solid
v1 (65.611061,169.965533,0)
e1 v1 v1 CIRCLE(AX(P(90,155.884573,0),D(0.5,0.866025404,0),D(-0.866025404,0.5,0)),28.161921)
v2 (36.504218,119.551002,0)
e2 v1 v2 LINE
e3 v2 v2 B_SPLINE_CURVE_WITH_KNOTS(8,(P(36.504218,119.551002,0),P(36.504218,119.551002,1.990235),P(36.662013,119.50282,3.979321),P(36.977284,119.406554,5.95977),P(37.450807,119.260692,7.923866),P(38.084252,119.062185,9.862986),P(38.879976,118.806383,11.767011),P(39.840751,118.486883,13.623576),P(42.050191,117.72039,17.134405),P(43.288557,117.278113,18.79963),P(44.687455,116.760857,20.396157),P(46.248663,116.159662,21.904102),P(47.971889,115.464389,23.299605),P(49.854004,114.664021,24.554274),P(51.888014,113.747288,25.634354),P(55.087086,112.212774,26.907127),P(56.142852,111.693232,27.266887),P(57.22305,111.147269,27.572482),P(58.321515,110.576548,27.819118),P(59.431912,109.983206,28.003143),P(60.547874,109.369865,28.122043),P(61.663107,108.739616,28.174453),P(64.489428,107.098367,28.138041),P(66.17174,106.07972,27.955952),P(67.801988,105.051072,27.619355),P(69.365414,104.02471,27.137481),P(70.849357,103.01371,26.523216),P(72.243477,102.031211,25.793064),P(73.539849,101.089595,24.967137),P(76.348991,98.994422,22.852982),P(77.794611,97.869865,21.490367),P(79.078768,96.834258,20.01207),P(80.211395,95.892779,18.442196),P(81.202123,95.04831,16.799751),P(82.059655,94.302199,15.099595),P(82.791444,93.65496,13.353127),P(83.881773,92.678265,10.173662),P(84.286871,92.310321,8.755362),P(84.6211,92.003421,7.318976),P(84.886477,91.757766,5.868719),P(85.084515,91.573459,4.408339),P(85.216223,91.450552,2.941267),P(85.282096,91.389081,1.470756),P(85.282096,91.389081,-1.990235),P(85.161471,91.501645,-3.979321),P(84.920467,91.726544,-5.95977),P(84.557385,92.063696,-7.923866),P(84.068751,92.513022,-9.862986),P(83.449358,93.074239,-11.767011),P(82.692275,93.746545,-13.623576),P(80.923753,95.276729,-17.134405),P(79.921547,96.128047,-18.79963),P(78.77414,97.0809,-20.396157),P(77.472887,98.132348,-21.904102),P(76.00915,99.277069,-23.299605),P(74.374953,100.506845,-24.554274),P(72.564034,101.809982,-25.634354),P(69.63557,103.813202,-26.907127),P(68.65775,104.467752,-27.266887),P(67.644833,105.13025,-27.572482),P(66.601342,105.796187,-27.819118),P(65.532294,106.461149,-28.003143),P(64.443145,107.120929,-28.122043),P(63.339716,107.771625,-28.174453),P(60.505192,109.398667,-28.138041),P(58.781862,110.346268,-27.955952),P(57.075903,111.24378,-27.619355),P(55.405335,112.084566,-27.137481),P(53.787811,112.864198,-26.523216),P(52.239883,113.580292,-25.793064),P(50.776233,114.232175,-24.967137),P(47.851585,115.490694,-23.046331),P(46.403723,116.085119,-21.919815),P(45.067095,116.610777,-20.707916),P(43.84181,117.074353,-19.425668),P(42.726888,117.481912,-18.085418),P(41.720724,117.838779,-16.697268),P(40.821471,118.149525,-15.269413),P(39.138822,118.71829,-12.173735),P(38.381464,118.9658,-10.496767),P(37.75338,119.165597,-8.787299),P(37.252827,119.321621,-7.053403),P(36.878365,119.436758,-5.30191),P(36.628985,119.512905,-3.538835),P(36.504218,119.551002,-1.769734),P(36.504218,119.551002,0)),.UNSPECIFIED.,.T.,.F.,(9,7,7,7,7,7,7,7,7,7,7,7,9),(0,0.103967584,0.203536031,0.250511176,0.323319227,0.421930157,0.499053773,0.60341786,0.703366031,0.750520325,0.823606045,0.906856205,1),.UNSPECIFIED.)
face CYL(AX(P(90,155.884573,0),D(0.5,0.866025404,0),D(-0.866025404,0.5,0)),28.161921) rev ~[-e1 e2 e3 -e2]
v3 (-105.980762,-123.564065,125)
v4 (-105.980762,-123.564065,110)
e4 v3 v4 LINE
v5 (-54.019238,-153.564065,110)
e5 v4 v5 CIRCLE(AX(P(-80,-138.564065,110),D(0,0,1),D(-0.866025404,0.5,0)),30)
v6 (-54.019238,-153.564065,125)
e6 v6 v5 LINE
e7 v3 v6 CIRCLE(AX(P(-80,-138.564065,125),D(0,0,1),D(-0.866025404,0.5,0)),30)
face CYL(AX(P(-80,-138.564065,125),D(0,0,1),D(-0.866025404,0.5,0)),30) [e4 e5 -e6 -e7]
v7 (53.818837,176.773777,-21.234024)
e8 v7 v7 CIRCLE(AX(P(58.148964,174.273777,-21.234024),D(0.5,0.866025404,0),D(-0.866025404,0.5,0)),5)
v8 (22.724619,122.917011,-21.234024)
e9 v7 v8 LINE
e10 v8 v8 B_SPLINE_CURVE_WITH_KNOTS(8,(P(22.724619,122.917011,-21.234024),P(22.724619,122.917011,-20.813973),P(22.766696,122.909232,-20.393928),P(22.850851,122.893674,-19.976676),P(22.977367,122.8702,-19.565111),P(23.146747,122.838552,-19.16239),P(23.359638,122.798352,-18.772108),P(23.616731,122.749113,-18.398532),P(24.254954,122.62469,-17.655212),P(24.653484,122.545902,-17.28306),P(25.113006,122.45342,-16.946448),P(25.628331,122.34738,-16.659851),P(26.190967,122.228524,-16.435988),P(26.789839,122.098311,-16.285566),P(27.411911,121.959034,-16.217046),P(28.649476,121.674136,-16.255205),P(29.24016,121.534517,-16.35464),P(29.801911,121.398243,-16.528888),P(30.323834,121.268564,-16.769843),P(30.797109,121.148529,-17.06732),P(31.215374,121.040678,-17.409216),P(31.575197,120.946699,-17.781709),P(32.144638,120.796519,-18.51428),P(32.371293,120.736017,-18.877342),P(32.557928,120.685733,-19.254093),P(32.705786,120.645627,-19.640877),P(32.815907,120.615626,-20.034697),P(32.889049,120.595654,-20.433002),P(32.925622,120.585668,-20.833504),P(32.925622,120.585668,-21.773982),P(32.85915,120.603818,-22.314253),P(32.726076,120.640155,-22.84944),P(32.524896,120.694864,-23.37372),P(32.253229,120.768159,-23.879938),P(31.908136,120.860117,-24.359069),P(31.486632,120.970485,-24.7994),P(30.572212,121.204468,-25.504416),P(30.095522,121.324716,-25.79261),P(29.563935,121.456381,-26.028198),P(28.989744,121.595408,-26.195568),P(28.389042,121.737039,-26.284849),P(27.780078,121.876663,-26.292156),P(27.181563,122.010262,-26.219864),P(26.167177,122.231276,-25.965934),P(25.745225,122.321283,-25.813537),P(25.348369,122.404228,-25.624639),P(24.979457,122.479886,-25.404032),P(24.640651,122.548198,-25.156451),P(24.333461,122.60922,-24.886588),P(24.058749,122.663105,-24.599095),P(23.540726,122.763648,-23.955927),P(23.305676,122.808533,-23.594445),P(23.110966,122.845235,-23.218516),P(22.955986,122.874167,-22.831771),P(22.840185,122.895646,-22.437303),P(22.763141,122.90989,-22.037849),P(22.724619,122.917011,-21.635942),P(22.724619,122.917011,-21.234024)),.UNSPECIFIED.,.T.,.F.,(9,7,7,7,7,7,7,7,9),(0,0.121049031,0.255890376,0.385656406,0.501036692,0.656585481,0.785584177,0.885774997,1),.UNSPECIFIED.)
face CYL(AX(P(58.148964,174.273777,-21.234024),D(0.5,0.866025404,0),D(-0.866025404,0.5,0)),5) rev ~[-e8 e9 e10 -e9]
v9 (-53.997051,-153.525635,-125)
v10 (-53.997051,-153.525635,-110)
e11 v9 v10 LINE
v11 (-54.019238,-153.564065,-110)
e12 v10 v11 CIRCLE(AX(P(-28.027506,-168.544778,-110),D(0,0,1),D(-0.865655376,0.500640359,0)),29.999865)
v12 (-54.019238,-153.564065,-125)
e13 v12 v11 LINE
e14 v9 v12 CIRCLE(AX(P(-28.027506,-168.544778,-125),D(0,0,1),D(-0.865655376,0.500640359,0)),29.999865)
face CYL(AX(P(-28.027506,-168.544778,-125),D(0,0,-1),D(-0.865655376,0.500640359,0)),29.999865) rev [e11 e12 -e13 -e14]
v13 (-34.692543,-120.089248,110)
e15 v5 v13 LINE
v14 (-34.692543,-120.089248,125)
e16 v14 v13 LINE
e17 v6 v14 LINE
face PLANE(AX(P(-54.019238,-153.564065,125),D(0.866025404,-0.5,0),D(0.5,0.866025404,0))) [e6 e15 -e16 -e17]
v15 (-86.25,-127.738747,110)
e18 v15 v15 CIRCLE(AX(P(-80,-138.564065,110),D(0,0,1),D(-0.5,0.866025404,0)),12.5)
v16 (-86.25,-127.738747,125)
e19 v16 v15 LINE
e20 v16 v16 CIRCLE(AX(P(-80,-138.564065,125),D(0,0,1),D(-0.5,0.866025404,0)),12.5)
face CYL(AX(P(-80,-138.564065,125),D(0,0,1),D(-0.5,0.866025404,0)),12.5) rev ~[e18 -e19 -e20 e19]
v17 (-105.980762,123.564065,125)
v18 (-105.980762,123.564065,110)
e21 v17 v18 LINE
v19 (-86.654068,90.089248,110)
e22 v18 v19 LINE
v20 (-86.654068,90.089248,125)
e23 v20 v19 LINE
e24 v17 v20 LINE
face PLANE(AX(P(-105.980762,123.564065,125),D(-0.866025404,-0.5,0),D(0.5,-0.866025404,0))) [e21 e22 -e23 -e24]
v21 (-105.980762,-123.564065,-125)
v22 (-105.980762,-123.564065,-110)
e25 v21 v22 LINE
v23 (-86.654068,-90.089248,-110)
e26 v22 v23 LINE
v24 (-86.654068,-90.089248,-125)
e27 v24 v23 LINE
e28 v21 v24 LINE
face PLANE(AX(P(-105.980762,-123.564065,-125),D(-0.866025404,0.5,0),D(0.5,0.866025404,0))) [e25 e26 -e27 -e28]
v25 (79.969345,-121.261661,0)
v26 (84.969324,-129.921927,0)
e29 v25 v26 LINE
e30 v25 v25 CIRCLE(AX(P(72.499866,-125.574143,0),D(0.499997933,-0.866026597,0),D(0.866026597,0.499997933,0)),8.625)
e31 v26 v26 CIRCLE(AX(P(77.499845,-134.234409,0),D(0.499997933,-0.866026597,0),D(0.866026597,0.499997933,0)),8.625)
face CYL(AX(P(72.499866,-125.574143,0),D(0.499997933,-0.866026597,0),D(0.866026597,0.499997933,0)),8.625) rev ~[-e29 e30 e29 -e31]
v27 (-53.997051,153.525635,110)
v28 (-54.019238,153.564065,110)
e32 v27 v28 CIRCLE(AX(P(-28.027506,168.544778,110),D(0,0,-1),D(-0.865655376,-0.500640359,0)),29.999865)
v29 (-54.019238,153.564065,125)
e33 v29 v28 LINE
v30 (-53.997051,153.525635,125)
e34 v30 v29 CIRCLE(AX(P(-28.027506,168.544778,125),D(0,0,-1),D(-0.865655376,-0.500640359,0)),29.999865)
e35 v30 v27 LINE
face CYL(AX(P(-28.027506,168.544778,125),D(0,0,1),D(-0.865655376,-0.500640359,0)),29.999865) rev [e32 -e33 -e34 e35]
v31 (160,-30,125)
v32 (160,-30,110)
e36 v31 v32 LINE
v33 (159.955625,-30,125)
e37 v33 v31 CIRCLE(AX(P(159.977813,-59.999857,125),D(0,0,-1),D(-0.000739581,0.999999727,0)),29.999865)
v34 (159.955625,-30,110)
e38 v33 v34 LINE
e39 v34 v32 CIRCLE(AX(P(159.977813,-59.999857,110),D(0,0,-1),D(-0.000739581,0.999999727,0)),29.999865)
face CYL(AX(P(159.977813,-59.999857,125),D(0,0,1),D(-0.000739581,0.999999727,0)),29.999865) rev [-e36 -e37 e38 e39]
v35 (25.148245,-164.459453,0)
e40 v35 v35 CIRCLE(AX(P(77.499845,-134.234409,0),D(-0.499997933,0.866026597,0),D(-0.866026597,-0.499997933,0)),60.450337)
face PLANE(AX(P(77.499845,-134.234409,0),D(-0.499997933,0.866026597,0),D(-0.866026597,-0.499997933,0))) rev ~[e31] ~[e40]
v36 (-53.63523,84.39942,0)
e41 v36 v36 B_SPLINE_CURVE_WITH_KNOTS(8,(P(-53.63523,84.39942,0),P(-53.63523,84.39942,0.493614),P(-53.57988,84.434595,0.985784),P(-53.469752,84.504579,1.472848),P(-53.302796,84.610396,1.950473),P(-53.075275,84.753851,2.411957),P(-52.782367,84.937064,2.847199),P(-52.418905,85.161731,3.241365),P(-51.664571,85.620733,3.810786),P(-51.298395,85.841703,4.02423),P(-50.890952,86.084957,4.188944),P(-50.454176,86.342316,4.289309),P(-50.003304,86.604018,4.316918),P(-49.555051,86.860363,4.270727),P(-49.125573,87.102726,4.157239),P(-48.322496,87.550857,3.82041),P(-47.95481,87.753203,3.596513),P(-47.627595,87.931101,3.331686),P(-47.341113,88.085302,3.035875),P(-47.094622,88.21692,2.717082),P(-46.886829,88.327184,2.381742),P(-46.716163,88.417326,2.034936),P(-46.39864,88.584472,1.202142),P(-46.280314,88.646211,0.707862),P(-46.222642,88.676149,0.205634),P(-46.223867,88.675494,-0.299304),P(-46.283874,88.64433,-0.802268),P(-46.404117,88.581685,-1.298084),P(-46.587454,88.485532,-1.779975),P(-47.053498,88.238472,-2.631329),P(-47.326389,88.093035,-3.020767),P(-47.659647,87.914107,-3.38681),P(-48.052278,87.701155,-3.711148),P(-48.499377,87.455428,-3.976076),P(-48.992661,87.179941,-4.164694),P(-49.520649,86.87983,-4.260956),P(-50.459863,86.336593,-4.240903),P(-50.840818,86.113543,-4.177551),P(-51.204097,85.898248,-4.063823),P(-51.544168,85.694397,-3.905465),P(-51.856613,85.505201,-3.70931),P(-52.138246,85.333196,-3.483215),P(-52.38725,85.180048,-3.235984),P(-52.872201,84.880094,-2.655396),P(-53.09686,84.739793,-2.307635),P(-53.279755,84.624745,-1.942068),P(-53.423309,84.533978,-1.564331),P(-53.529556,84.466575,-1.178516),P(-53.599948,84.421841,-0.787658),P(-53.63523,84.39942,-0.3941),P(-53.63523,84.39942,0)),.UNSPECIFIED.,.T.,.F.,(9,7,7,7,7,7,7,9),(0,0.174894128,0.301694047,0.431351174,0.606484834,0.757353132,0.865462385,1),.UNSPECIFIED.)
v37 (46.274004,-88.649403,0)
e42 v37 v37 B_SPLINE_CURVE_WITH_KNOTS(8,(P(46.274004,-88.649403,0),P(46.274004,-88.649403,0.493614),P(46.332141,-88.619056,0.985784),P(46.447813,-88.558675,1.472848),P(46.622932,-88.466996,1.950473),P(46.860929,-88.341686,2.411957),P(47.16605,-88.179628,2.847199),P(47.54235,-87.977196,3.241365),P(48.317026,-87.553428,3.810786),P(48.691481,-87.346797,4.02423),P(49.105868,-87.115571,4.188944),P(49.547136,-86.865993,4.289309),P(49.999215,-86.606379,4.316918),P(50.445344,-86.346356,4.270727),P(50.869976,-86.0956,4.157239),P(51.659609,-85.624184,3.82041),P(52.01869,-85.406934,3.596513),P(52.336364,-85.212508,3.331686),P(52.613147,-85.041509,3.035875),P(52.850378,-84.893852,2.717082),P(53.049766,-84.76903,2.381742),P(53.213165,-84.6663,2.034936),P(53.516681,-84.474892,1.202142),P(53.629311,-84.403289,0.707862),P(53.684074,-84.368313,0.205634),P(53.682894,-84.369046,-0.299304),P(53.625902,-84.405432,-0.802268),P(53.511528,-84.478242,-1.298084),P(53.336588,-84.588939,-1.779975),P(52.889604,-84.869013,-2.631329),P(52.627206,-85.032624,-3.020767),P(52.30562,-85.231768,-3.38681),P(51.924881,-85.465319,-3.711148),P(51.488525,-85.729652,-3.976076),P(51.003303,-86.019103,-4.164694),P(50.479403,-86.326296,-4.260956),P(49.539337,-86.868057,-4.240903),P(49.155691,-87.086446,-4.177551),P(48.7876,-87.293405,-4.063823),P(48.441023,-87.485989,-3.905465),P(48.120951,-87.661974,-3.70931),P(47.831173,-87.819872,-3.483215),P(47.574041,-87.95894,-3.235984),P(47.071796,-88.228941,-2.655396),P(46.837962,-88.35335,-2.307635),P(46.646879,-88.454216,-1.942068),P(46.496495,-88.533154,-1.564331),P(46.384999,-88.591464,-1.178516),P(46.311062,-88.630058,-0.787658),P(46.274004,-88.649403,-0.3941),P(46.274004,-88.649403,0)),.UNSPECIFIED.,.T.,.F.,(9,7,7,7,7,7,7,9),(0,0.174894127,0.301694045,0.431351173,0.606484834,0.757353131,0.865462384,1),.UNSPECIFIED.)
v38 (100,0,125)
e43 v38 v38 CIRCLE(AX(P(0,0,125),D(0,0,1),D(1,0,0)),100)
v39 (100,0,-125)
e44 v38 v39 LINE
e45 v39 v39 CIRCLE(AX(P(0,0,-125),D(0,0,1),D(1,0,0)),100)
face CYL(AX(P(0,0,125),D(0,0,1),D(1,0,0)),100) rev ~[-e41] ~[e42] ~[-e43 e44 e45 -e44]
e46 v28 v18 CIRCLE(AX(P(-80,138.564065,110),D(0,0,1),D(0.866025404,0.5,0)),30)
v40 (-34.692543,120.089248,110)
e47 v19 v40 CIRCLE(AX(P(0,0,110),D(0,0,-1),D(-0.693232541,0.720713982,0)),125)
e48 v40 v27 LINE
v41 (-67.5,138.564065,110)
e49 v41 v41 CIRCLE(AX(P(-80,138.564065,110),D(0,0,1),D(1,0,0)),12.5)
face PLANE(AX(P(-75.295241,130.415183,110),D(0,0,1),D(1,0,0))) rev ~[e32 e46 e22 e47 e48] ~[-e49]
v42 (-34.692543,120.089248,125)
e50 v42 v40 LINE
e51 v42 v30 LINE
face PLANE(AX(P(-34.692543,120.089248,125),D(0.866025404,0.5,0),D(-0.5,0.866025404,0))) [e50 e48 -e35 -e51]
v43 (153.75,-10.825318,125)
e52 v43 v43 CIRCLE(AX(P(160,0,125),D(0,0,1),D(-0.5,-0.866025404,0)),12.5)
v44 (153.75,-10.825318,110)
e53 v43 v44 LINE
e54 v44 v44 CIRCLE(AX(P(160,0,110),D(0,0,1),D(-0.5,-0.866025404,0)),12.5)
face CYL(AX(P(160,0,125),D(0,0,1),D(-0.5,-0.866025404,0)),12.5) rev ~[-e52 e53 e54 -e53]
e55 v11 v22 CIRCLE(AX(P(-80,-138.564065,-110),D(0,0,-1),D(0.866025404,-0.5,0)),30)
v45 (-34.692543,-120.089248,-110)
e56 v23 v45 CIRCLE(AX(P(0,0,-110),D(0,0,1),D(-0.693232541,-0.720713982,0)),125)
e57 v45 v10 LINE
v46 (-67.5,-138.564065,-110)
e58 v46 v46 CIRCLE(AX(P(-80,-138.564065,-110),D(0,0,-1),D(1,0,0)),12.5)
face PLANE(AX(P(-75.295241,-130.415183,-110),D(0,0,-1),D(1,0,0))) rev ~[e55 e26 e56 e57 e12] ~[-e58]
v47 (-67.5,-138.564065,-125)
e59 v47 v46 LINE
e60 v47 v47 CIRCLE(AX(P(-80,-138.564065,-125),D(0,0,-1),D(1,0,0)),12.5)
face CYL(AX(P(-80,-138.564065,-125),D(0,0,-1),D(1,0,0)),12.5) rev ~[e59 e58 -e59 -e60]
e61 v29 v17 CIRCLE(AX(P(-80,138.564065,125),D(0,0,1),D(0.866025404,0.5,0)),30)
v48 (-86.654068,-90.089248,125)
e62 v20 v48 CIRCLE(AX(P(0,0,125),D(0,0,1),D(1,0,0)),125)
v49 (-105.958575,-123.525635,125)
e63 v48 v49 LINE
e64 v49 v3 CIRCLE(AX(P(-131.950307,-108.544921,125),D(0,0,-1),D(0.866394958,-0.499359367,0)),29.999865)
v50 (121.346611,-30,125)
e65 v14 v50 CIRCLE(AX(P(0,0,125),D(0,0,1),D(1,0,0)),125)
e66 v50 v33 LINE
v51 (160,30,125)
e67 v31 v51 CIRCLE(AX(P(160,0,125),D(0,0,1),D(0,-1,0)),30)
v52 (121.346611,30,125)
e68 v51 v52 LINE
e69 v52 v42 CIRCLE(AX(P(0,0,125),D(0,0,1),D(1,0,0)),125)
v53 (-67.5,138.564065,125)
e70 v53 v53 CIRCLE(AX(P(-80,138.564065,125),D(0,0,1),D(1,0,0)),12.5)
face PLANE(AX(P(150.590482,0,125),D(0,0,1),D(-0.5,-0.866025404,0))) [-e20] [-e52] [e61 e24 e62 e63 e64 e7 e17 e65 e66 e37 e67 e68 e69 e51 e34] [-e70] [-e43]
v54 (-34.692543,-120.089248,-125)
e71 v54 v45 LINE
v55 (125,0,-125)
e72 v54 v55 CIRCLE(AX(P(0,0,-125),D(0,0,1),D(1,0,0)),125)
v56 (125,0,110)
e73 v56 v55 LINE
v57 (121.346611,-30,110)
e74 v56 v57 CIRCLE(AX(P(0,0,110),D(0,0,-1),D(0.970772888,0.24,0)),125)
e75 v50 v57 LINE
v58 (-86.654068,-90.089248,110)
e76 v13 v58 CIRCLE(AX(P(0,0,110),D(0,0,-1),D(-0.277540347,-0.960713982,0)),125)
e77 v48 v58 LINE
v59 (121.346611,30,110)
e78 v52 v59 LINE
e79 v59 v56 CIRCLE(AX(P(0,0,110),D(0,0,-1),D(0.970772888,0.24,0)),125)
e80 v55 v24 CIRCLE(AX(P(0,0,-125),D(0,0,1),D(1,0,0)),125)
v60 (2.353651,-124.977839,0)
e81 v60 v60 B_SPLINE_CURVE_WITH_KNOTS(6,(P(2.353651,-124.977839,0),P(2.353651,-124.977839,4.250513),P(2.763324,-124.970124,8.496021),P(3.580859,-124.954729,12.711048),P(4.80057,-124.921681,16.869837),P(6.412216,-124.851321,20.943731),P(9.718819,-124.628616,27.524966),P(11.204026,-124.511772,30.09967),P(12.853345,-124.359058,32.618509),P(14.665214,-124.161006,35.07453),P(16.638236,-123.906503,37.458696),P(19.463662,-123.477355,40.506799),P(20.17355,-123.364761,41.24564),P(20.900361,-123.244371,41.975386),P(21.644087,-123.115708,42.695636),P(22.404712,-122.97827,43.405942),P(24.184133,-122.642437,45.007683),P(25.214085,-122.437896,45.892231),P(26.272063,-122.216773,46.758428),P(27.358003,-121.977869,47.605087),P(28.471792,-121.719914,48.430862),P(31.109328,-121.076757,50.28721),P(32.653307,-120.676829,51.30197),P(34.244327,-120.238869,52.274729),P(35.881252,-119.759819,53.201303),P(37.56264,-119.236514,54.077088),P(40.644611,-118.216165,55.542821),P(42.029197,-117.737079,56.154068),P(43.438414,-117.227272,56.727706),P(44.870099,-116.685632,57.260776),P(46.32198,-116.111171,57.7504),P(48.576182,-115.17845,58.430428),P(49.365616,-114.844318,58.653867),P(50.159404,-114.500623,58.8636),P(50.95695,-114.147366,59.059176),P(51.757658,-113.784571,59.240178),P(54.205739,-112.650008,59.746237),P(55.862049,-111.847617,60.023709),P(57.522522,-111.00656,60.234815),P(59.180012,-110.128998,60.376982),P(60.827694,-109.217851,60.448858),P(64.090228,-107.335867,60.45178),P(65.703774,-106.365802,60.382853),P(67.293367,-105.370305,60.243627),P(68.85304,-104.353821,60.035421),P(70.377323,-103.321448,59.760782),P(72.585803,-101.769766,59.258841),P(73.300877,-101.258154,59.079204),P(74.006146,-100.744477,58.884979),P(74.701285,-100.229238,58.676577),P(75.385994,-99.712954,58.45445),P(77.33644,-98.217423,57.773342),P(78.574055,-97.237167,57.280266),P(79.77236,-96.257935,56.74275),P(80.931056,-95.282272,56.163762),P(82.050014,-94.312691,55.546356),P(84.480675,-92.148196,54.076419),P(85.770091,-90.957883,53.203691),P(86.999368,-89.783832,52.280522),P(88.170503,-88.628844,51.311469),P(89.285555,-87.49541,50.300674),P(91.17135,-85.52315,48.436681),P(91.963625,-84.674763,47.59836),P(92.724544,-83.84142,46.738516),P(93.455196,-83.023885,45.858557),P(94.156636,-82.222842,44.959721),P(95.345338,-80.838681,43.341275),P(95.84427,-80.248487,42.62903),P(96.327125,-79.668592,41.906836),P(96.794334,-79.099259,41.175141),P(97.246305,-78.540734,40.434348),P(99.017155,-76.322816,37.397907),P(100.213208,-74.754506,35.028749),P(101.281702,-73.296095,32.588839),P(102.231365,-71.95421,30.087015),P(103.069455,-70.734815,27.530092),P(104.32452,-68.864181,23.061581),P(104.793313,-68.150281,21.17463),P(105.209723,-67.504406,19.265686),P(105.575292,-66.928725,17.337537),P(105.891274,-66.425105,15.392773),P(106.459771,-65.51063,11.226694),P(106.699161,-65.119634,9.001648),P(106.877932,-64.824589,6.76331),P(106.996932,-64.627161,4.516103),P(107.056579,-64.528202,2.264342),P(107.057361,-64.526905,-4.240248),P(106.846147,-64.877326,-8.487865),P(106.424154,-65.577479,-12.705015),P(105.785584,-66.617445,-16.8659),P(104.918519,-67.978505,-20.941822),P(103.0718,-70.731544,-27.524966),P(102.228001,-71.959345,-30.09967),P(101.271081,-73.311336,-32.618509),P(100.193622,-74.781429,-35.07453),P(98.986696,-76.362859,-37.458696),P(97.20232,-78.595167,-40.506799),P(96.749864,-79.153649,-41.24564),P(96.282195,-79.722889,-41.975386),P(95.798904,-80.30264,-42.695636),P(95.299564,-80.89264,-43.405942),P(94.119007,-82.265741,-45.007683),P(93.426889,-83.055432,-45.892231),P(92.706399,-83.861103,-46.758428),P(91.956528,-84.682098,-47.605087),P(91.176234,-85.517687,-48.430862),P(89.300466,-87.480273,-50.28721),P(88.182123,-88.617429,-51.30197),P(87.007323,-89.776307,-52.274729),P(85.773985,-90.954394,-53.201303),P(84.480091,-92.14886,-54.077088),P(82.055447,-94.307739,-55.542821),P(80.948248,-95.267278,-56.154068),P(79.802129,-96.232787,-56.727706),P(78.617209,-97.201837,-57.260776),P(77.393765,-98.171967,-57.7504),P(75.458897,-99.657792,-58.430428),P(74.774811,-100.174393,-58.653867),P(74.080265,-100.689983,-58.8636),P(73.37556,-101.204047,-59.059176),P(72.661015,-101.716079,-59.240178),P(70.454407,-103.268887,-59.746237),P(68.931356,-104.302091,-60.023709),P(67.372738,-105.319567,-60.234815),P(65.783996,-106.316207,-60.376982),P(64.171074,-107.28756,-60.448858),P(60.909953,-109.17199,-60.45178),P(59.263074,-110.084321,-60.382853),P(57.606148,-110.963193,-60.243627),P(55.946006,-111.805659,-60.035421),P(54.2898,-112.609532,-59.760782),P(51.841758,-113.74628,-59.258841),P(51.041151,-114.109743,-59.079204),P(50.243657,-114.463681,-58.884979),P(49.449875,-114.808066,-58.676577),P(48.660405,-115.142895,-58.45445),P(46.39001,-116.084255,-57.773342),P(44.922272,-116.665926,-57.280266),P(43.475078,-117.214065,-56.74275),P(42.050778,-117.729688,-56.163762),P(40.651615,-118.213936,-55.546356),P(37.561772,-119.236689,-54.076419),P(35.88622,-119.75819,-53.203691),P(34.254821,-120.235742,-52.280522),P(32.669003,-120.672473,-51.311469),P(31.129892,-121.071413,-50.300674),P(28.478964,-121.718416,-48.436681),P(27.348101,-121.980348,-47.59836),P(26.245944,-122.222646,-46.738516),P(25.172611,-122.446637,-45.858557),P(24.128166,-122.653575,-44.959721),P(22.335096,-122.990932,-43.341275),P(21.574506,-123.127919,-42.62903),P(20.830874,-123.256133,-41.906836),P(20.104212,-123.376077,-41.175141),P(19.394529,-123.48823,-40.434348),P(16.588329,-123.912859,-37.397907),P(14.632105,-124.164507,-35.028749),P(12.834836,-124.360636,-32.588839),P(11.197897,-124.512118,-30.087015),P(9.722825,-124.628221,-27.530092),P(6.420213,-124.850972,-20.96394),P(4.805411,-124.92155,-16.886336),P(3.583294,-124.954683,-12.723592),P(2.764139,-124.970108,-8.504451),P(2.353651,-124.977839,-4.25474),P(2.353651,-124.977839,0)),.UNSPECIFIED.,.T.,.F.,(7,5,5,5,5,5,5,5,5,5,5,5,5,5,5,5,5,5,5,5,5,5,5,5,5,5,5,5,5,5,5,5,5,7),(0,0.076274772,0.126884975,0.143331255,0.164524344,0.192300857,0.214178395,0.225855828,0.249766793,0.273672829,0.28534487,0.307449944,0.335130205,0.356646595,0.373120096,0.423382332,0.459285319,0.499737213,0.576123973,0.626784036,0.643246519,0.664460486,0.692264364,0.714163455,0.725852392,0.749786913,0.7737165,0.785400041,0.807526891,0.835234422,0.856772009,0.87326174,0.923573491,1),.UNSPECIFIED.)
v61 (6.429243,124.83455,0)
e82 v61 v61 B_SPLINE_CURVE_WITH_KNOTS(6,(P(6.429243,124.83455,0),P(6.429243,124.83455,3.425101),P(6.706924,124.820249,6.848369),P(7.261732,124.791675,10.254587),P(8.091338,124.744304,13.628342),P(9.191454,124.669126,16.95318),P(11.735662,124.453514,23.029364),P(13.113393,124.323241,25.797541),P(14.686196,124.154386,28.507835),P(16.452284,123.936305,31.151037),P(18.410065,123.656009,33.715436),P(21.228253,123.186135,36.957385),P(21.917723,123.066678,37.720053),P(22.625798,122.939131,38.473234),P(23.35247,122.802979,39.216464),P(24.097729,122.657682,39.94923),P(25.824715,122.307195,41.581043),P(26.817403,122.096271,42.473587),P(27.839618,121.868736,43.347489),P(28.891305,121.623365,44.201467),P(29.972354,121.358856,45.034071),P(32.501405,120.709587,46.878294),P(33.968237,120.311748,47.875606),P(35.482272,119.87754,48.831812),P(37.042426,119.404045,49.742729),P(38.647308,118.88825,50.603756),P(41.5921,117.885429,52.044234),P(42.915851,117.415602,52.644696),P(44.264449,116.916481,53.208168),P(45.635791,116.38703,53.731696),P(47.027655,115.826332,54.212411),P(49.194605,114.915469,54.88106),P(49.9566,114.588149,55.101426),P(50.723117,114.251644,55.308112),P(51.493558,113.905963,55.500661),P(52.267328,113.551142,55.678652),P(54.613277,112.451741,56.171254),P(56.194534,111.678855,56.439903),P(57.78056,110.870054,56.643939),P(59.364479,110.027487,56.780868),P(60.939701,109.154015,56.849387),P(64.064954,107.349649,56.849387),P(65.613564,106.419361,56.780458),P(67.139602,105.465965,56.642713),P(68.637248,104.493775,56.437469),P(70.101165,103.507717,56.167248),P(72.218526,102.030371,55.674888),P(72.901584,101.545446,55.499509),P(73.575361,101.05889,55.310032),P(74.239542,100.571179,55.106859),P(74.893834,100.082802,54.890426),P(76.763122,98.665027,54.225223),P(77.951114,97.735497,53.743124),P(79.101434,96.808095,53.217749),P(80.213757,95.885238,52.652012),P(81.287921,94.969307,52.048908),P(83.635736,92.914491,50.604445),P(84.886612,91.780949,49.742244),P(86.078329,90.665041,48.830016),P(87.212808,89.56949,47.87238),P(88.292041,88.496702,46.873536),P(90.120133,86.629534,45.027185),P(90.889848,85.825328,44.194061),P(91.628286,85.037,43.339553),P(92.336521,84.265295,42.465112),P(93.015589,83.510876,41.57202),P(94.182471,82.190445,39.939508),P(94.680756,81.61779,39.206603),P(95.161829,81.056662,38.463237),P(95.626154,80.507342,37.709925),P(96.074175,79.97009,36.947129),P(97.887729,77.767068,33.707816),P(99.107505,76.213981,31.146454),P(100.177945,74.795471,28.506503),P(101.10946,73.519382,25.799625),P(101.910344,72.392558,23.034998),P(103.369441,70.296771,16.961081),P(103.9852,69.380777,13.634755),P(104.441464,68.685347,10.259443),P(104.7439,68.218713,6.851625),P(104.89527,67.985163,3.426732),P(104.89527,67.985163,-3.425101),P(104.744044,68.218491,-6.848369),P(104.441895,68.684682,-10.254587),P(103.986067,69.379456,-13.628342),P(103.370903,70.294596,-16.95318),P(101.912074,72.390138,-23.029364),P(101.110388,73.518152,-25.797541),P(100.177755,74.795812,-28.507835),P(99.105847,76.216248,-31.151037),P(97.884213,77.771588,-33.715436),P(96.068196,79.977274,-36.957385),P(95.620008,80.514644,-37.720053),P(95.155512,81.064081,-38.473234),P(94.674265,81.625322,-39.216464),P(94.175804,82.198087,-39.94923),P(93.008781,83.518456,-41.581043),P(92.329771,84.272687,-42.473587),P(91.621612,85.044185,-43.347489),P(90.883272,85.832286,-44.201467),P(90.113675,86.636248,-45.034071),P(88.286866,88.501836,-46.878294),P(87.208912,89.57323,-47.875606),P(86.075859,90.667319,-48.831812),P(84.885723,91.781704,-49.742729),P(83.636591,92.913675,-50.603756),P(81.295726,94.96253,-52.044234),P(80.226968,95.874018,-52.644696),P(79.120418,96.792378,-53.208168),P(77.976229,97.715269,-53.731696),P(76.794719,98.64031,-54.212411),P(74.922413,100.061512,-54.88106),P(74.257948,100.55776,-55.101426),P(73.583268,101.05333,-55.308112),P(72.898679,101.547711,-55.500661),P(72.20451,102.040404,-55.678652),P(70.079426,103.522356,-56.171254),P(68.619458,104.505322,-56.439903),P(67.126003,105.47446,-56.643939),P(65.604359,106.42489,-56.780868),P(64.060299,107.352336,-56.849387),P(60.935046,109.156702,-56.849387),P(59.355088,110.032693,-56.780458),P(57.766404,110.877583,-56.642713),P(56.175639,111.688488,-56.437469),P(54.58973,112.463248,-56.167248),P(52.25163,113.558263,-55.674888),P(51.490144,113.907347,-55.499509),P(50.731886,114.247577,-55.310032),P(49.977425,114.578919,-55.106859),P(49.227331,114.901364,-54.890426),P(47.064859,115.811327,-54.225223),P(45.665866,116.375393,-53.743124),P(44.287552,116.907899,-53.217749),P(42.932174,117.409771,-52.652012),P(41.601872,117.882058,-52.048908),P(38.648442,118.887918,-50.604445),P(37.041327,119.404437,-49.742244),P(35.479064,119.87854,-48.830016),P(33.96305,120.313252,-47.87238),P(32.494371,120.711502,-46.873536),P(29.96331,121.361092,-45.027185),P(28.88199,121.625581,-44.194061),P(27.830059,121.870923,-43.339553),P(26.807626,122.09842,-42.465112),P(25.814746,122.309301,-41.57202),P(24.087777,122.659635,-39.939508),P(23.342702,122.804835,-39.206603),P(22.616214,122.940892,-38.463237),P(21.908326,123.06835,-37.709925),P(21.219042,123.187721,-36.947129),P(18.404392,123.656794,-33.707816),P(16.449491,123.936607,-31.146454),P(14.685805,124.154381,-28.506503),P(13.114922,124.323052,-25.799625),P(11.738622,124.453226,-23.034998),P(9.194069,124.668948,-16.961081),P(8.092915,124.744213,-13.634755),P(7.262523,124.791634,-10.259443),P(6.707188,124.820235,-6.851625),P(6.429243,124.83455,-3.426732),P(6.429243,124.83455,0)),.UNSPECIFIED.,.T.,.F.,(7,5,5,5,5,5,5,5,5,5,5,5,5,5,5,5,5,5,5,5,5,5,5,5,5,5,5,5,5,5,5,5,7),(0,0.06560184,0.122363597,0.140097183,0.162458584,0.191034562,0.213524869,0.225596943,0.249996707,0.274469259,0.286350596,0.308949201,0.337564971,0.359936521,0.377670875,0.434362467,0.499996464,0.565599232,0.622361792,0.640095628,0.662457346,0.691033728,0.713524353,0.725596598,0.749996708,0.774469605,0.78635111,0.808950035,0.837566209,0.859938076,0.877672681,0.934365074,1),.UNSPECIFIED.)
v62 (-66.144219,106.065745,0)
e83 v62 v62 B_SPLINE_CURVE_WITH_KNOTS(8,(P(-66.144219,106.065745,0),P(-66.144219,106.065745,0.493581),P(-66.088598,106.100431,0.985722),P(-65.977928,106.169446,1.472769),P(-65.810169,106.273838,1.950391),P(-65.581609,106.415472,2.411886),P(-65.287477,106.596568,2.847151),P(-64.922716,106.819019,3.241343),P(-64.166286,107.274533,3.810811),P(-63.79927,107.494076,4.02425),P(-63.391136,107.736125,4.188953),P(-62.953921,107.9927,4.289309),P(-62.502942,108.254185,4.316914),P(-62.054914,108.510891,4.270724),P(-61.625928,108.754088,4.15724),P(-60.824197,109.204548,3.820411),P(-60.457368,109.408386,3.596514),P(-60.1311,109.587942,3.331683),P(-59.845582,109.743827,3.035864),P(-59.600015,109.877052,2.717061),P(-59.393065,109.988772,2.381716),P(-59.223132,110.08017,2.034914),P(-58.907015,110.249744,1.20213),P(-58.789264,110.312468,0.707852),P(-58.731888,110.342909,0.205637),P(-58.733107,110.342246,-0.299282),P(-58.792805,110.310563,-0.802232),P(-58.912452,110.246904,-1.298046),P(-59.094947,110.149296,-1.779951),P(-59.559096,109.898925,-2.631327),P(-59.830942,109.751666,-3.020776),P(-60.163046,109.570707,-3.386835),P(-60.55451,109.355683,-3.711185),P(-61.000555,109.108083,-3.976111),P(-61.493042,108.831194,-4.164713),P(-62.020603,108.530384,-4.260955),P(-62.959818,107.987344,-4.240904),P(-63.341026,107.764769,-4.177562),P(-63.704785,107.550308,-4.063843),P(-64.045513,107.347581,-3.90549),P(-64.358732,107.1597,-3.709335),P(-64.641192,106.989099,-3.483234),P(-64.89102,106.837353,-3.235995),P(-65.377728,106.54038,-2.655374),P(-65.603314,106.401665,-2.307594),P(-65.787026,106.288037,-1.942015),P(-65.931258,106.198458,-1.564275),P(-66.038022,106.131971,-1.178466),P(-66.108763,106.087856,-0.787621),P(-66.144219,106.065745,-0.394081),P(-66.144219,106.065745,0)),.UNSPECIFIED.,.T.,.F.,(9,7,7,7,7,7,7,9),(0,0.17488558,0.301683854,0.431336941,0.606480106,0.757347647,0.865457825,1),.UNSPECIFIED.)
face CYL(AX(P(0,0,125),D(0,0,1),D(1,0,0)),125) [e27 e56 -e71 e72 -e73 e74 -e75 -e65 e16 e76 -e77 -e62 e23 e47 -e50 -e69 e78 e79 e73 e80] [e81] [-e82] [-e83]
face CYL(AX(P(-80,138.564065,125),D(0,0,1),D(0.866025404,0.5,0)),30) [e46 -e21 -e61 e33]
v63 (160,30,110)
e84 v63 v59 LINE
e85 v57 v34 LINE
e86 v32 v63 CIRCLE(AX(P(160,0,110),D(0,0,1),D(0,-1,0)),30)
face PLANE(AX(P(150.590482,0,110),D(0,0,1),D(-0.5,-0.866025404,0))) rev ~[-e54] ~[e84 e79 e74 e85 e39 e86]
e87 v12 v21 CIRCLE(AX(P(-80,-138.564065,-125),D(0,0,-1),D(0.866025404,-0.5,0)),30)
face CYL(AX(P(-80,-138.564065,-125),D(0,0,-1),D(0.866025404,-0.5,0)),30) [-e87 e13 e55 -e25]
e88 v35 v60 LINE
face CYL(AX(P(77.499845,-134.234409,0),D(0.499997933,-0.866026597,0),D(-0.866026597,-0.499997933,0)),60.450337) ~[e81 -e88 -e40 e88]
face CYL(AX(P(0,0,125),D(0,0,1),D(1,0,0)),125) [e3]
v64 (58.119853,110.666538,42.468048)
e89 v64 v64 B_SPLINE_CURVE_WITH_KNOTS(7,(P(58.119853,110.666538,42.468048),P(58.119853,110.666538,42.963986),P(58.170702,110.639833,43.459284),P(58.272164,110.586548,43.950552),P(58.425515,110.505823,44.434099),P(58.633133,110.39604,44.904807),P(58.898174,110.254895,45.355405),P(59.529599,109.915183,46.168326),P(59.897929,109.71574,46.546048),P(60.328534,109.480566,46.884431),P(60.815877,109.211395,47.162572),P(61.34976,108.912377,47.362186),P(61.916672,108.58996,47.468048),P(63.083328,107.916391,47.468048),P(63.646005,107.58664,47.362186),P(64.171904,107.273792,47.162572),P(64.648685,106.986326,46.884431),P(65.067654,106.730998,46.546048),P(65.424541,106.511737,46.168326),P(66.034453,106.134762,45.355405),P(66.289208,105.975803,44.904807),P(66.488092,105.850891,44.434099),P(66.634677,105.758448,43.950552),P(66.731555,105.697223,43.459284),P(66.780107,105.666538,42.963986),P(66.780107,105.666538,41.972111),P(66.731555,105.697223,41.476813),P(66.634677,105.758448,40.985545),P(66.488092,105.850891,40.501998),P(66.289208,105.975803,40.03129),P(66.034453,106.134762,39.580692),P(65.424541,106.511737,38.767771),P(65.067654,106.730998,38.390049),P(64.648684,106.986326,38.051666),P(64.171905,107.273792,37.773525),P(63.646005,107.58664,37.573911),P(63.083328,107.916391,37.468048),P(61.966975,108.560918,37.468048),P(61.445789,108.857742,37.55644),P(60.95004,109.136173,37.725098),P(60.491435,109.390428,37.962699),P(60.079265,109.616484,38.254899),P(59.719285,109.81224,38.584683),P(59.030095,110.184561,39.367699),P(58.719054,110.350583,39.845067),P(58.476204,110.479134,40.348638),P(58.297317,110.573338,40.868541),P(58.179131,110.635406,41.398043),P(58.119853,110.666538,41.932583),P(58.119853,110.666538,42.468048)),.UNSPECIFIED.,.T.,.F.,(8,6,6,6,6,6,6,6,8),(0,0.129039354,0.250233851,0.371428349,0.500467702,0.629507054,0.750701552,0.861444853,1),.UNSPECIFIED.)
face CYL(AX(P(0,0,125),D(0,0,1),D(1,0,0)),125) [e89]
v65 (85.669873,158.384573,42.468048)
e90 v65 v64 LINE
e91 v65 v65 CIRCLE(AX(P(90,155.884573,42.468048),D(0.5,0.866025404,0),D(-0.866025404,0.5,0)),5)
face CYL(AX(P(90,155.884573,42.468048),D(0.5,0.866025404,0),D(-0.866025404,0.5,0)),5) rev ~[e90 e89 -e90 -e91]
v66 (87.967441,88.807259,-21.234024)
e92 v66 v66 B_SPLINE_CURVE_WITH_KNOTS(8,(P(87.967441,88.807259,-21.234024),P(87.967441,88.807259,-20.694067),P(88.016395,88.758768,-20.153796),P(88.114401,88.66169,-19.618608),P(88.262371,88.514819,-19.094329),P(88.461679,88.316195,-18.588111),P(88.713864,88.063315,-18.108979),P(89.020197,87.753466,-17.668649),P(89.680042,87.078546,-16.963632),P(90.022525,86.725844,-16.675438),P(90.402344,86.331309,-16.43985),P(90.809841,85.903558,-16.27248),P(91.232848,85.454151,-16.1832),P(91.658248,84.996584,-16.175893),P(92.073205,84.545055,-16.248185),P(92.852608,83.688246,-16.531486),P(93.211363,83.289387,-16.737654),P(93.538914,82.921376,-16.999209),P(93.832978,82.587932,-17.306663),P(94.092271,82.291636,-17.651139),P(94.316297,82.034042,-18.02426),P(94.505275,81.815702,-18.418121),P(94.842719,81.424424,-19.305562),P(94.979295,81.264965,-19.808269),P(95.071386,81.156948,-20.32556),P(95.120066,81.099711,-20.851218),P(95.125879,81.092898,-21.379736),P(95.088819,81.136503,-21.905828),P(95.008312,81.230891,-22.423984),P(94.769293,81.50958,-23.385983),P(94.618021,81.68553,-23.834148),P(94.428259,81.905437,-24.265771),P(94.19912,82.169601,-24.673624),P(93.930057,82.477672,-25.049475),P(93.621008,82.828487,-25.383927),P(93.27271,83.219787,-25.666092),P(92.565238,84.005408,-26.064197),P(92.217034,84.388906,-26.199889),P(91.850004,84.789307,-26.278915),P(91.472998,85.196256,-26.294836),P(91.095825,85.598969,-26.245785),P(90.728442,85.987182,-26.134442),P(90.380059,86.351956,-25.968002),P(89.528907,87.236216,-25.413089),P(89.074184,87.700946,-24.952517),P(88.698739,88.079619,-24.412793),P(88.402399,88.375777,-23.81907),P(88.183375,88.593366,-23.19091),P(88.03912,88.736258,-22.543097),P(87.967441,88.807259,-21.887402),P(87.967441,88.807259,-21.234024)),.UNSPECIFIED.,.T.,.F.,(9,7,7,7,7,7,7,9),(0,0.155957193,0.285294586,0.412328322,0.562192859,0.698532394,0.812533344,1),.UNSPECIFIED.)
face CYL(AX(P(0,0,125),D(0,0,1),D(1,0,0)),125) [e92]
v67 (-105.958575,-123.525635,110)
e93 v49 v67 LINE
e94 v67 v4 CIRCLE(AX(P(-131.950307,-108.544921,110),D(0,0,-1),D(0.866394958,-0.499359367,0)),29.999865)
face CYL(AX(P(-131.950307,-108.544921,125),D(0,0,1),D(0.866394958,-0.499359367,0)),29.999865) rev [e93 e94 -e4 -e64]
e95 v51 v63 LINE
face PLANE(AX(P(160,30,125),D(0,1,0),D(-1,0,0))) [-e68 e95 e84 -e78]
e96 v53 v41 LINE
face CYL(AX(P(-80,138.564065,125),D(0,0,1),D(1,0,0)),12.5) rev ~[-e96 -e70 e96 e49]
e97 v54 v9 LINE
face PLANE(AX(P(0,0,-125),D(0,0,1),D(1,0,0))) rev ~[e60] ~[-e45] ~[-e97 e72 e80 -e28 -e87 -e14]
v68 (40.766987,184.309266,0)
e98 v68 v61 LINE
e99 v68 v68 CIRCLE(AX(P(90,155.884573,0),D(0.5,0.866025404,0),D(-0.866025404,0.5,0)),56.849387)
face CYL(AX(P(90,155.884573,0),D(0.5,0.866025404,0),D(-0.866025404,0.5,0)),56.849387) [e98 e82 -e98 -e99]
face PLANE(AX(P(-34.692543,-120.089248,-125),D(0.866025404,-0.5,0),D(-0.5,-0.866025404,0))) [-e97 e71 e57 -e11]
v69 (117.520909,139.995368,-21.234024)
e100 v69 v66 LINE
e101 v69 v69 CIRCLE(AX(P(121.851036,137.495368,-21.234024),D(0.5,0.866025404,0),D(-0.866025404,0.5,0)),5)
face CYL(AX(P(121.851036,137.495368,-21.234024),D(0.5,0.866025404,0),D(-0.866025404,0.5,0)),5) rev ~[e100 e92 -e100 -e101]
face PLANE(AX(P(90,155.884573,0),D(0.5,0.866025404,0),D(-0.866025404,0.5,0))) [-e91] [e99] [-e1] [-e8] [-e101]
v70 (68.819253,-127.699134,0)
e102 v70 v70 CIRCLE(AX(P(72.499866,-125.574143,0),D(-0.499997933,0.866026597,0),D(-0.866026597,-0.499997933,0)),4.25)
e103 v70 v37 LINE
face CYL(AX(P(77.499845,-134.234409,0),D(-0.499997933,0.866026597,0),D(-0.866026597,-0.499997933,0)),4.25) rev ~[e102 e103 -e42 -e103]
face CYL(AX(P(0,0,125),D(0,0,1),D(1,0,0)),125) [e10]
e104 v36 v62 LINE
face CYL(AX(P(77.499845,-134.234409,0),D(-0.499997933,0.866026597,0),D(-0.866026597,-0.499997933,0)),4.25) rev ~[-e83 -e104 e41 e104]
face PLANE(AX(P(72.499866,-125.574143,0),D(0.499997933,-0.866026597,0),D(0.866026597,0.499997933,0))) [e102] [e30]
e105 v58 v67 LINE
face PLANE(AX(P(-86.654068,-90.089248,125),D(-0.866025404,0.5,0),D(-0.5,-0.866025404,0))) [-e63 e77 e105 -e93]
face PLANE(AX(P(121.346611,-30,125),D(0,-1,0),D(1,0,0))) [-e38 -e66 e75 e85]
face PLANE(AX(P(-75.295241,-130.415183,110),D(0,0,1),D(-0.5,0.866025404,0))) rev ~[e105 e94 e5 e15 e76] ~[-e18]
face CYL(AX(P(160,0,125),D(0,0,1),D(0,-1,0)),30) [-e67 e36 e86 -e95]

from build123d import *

# Parameters (mm, degrees)
F1_R             = 125
F1_R_2           = 100
F2_DEPTH         = 250
F3_R             = 12.5
F4_DEPTH         = 15
F4_COPIES_COUNT  = 3
F4_COPIES1_COUNT = 2
F10_R            = 56.8493867215
F10_R_2          = 5
F10_R_3          = 28.1619206838
F11_DEPTH        = 68.6754869442
F15_R            = 60.4503373428
F18_D            = 8.5
F18_CBORE_D      = 17.25
F18_CBORE_DEPTH  = 10


# Not quite as in the source:
# - ends of sketch curves that miss each other by under 0.0002 mm in the source are joined
# - a pattern or mirror of a feature is missing from the dataset's text; its kind, count and spacing are read off the source's solid


with BuildPart() as f2:
    # F1 (on offset) → F2 (new body)
    with BuildSketch(Plane.XY.offset(125)):
        Circle(F1_R)
        Circle(F1_R_2, mode=Mode.SUBTRACT)
    extrude(amount=-F2_DEPTH)

    # F3 (on face) → F4 (join)
    with BuildSketch(Plane.XY.offset(125)):
        with BuildLine():
            Line((-105.9807621135, 123.5640646055), (-86.6540676111, 90.0892477849))
            ThreePointArc((-86.6540676111, 90.0892477849), (-62.5, 108.2531754731), (-34.692543384, 120.0892477849))
            Line((-34.692543384, 120.0892477849), (-53.9970505647, 153.5256350369))
            ThreePointArc((-53.9970505647, 153.5256350369), (-54.008151328, 153.5448457136), (-54.0192378865, 153.5640646055))
            ThreePointArc((-54.0192378865, 153.5640646055), (-95, 164.544826719), (-105.9807621135, 123.5640646055))
        make_face()
        with Locations((-80, 138.5640646055)):
            Circle(F3_R, mode=Mode.SUBTRACT)
    f4 = extrude(amount=-F4_DEPTH)

    # F4_copies: F4 ×3 about axis
    f4_copies_axis = Axis((0, 0, 0), (0, 0, 1))
    for i in range(1, F4_COPIES_COUNT):
        add(f4.rotate(f4_copies_axis, i * 360 / F4_COPIES_COUNT))

    # F4_copies1: F4 ×2 about axis
    f4_copies1_axis = Axis((0, 0, 0), (1, 0, 0))
    for i in range(1, F4_COPIES1_COUNT):
        add(f4.rotate(f4_copies1_axis, i * 360 / F4_COPIES1_COUNT))

    # F10 (on offset) → F11 (join, through all)
    with BuildSketch(Plane(origin=(90, 155.8845726812, 0), x_dir=(-0.8660254038, 0.5, 0), z_dir=(0.5, 0.8660254038, 0))):
        Circle(F10_R)
        with Locations((-36.7784088222, -21.2340242338)):
            Circle(F10_R_2, mode=Mode.SUBTRACT)
        with Locations((36.7784088222, -21.2340242338)):
            Circle(F10_R_2, mode=Mode.SUBTRACT)
        Circle(F10_R_3, mode=Mode.SUBTRACT)
        with Locations((0, 42.4680484677)):
            Circle(F10_R_2, mode=Mode.SUBTRACT)
    extrude(amount=-F11_DEPTH)

    # F15 (on offset) → F16 (join, up to the next surface of F2)
    with BuildSketch(Plane(origin=(77.4998450043, -134.2344088806, 0), x_dir=(-0.8660265969, -0.4999979334, 0), z_dir=(-0.4999979334, 0.8660265969, 0))):
        Circle(F15_R)
    extrude(until=Until.NEXT)

    # F18 (through all)
    with Locations(Plane(origin=(77.4998450043, -134.2344088806, 0), x_dir=(0.8660265969, 0.4999979334, 0), z_dir=(0.4999979334, -0.8660265969, 0))):
        with Locations((0, 0)):
            CounterBoreHole(F18_D / 2, F18_CBORE_D / 2, F18_CBORE_DEPTH)


solid = f2.part
